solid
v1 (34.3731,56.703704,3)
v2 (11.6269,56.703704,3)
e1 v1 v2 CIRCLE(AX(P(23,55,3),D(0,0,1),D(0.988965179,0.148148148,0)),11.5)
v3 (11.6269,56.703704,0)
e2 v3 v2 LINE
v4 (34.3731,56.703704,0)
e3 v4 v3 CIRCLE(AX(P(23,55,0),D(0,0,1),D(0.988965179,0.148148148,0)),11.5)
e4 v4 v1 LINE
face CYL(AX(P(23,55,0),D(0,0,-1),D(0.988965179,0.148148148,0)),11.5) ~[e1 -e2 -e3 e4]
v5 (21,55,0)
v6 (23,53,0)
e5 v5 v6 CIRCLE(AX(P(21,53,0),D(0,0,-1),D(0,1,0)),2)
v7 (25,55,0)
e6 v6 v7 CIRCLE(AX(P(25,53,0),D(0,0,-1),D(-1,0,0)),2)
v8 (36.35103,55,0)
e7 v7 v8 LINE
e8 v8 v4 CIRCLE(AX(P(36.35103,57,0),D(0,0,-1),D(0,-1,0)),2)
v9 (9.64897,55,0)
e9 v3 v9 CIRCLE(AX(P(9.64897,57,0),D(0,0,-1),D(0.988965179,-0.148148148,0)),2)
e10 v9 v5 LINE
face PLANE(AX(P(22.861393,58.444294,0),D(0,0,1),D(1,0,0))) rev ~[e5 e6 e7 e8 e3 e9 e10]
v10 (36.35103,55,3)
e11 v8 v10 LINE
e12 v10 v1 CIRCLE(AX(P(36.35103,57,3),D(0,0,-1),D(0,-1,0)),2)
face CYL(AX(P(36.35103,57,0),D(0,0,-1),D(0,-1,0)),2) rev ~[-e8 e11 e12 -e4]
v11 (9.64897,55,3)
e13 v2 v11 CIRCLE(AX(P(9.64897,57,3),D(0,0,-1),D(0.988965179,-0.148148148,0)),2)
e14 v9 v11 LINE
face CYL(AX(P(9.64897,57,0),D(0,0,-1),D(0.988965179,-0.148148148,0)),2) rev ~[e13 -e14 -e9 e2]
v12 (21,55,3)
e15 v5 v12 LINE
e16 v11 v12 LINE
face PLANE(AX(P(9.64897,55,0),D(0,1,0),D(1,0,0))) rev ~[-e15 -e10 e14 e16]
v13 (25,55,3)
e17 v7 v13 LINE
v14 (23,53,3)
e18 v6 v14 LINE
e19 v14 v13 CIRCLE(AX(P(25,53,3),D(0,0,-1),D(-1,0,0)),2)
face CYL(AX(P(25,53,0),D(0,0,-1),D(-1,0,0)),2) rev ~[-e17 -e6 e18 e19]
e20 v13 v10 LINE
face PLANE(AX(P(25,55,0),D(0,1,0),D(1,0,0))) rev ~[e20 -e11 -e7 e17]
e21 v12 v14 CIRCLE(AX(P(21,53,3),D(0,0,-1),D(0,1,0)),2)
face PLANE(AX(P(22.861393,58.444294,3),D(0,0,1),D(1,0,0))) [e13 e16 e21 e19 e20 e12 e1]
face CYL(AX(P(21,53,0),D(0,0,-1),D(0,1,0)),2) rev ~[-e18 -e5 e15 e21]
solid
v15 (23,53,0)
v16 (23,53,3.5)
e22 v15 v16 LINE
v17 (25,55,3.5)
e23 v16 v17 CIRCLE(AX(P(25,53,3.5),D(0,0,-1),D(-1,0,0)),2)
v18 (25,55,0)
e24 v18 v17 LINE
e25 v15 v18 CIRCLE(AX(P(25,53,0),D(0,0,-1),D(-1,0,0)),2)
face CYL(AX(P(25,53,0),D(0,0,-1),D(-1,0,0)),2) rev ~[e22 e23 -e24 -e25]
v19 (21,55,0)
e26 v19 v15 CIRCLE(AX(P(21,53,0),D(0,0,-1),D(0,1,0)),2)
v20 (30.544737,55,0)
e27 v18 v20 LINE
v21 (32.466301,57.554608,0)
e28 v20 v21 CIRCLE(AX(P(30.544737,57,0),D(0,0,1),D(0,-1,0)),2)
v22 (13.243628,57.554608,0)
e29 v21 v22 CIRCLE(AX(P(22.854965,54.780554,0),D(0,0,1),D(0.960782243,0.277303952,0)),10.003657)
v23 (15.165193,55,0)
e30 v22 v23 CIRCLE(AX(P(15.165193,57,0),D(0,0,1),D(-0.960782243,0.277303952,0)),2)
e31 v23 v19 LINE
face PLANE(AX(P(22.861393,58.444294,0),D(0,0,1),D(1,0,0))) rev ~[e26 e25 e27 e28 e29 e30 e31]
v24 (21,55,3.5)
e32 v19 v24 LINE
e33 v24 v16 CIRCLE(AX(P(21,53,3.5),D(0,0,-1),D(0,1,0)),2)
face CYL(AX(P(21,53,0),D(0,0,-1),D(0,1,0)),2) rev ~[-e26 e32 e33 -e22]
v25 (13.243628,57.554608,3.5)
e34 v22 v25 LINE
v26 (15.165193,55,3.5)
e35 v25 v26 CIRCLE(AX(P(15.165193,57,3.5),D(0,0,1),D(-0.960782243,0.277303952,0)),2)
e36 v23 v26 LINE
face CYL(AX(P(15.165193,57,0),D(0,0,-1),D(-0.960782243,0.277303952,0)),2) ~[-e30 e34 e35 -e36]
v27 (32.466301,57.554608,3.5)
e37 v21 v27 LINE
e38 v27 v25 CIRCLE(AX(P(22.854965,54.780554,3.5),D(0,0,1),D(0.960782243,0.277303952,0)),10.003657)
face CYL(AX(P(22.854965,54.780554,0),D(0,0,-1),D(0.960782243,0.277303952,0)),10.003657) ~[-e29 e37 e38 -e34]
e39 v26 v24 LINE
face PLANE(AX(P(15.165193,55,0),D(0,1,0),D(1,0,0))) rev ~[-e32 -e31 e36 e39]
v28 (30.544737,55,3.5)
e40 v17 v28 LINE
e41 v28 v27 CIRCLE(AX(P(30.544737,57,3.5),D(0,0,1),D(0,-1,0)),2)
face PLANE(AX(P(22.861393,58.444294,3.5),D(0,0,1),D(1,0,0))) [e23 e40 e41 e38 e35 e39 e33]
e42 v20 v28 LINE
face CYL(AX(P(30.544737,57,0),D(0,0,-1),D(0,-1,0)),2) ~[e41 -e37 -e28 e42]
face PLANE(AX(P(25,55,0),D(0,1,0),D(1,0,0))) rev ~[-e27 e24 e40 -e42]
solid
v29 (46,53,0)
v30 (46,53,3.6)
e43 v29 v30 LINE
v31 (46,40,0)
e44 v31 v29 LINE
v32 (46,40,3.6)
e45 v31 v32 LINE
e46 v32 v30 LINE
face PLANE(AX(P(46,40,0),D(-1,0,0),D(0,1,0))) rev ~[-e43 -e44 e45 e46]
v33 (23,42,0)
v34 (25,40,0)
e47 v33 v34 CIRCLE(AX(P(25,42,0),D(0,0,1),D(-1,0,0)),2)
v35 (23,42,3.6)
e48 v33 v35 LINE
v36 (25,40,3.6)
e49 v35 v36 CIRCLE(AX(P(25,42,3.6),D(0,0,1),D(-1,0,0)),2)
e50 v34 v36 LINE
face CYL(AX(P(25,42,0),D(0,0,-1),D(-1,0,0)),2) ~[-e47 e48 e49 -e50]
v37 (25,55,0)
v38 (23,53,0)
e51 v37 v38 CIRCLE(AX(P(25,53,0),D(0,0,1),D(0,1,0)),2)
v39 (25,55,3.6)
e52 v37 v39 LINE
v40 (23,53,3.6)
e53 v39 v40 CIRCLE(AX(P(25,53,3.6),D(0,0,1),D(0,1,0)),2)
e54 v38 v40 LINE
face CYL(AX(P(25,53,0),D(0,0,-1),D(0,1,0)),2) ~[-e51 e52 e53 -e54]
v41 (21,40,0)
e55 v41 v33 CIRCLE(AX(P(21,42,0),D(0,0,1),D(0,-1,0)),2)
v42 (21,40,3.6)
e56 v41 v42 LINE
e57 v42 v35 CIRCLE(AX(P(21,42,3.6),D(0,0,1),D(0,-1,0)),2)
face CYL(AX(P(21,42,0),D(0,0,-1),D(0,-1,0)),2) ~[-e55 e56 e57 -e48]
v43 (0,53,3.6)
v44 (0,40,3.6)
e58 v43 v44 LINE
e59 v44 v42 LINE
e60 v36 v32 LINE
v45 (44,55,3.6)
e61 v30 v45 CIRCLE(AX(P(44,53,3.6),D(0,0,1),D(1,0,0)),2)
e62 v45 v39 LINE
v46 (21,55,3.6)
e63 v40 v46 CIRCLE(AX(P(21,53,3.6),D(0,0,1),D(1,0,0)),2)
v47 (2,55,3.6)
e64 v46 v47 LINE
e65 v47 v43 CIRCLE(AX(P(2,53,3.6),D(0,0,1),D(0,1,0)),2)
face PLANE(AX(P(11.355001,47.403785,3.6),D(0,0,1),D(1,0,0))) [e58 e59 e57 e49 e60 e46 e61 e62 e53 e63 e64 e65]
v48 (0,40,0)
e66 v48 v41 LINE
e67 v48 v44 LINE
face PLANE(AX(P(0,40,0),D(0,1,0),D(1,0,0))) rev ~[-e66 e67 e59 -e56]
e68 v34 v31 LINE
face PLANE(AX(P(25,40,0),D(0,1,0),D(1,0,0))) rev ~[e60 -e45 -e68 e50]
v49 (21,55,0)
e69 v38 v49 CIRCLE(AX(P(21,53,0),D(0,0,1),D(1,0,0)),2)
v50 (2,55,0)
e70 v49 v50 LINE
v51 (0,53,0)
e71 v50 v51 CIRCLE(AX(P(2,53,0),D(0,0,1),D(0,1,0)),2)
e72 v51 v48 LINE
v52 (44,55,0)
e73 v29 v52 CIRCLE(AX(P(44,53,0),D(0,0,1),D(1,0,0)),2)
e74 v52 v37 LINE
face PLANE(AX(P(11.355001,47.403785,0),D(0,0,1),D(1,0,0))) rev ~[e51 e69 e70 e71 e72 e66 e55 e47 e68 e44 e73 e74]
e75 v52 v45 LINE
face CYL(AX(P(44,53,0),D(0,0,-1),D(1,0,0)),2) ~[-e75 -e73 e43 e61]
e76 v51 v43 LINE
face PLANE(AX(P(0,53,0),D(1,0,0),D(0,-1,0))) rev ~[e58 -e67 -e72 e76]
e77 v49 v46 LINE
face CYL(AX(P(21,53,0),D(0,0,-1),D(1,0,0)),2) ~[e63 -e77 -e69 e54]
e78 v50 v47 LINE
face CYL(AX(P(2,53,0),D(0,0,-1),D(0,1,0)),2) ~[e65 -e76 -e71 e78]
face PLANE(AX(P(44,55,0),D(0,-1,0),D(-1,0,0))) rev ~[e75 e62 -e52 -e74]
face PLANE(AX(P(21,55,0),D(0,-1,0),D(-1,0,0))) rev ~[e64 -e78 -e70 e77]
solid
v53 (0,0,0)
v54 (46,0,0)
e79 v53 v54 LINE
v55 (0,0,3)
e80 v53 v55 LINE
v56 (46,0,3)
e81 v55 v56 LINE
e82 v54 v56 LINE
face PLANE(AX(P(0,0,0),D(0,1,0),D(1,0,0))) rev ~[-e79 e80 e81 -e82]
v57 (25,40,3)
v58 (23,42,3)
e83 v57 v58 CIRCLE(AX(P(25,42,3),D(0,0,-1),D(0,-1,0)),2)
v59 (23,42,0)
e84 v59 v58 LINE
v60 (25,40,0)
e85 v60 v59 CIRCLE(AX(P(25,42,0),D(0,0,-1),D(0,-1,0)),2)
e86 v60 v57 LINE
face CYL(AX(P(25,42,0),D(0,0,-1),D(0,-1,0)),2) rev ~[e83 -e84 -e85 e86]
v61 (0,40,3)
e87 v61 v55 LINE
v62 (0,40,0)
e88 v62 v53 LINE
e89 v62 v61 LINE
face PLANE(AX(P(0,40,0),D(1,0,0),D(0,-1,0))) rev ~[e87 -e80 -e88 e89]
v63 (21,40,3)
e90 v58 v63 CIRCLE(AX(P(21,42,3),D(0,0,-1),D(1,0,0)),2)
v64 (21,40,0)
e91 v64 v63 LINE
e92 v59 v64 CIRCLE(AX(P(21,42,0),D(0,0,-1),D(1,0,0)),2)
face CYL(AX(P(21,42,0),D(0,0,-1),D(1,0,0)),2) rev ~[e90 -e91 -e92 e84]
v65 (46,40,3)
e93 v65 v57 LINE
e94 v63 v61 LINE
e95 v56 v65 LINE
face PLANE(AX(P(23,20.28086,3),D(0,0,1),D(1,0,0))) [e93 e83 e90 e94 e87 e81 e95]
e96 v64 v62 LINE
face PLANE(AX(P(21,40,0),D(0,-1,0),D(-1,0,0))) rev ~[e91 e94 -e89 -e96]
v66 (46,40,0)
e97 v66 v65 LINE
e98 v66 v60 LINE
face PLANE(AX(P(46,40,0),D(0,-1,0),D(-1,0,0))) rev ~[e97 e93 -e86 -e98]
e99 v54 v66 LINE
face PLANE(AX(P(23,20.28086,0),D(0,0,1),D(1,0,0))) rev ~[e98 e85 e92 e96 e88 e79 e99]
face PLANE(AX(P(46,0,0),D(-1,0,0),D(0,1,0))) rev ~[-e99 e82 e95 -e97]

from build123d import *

# Parameters (mm, degrees)
F0_W     = 42.0281105638
F0_H     = 33.6269846465
F1_DEPTH = 3
F2_DEPTH = 3.6
F3_DEPTH = 3.5


# Not quite as in the source:
# - the program builds the solid bodies; features that only make, move or delete a surface that nothing else refers to are left out


with BuildPart() as f1:
    # F0 (on Top) → F1 (new body)
    with BuildSketch(Plane.XY):
        with BuildLine():
            Line((0, 40), (0, 0))
            Line((0, 0), (46, 0))
            Line((46, 0), (46, 40))
            Line((46, 40), (43, 40))
            Line((43, 40), (25, 40))
            ThreePointArc((25, 40), (23.5857864376, 40.5857864376), (23, 42))
            ThreePointArc((23, 42), (22.4142135624, 40.5857864376), (21, 40))
            Line((21, 40), (3, 40))
            Line((3, 40), (0, 40))
        make_face()
        with Locations((23, 19.8172420869)):
            Rectangle(F0_W, F0_H, mode=Mode.SUBTRACT)
        with Locations((23, 19.8172420869)):
            Rectangle(F0_W, F0_H)
    extrude(amount=F1_DEPTH)


with BuildPart() as f1b:
    # F0 (on Top) → F1, piece 2 (new body)
    with BuildSketch(Plane.XY):
        with BuildLine():
            ThreePointArc((13.2436284078, 57.5546079039), (13.5668788118, 55.7977553926), (15.1651928936, 55))
            Line((15.1651928936, 55), (21, 55))
            ThreePointArc((21, 55), (22.4142135624, 54.4142135624), (23, 53))
            ThreePointArc((23, 53), (23.5857864376, 54.4142135624), (25, 55))
            Line((25, 55), (30.5447365354, 55))
            ThreePointArc((30.5447365354, 55), (32.1430506172, 55.7977553926), (32.4663010212, 57.5546079039))
            ThreePointArc((32.4663010212, 57.5546079039), (22.8549647145, 64.7842115073), (13.2436284078, 57.5546079039))
        make_face()
        with BuildLine():
            ThreePointArc((11.6269004361, 56.7037037037), (10.954230091, 55.4846464781), (9.6489700772, 55))
            Line((9.6489700772, 55), (15.1651928936, 55))
            ThreePointArc((15.1651928936, 55), (13.5668788118, 55.7977553926), (13.2436284078, 57.5546079039))
            ThreePointArc((13.2436284078, 57.5546079039), (22.8549647145, 64.7842115073), (32.4663010212, 57.5546079039))
            ThreePointArc((32.4663010212, 57.5546079039), (32.1430506172, 55.7977553926), (30.5447365354, 55))
            Line((30.5447365354, 55), (36.3510299228, 55))
            ThreePointArc((36.3510299228, 55), (35.045769909, 55.4846464781), (34.3730995639, 56.7037037037))
            ThreePointArc((34.3730995639, 56.7037037037), (23, 66.5), (11.6269004361, 56.7037037037))
        make_face()
    extrude(amount=F1_DEPTH)


with BuildPart() as f2:
    # F0 (on Top) → F2 (new body)
    with BuildSketch(Plane.XY):
        with BuildLine():
            Line((0, 53), (0, 40))
            Line((0, 40), (3, 40))
            Line((3, 40), (21, 40))
            ThreePointArc((21, 40), (22.4142135624, 40.5857864376), (23, 42))
            Line((23, 42), (23, 53))
            ThreePointArc((23, 53), (22.4142135624, 54.4142135624), (21, 55))
            Line((21, 55), (15.1651928936, 55))
            Line((15.1651928936, 55), (9.6489700772, 55))
            Line((9.6489700772, 55), (2, 55))
            ThreePointArc((2, 55), (0.5857864376, 54.4142135624), (0, 53))
        make_face()
        with BuildLine():
            Line((43, 40), (46, 40))
            Line((46, 40), (46, 53))
            ThreePointArc((46, 53), (45.4142135624, 54.4142135624), (44, 55))
            Line((44, 55), (36.3510299228, 55))
            Line((36.3510299228, 55), (30.5447365354, 55))
            Line((30.5447365354, 55), (25, 55))
            ThreePointArc((25, 55), (23.5857864376, 54.4142135624), (23, 53))
            Line((23, 53), (23, 42))
            ThreePointArc((23, 42), (23.5857864376, 40.5857864376), (25, 40))
            Line((25, 40), (43, 40))
        make_face()
    extrude(amount=F2_DEPTH)


with BuildPart() as f3:
    # F0 (on Top) → F3 (new body)
    with BuildSketch(Plane.XY):
        with BuildLine():
            ThreePointArc((13.2436284078, 57.5546079039), (13.5668788118, 55.7977553926), (15.1651928936, 55))
            Line((15.1651928936, 55), (21, 55))
            ThreePointArc((21, 55), (22.4142135624, 54.4142135624), (23, 53))
            ThreePointArc((23, 53), (23.5857864376, 54.4142135624), (25, 55))
            Line((25, 55), (30.5447365354, 55))
            ThreePointArc((30.5447365354, 55), (32.1430506172, 55.7977553926), (32.4663010212, 57.5546079039))
            ThreePointArc((32.4663010212, 57.5546079039), (22.8549647145, 64.7842115073), (13.2436284078, 57.5546079039))
        make_face()
    extrude(amount=F3_DEPTH)


solid = Compound([f1.part, f1b.part, f2.part, f3.part])
